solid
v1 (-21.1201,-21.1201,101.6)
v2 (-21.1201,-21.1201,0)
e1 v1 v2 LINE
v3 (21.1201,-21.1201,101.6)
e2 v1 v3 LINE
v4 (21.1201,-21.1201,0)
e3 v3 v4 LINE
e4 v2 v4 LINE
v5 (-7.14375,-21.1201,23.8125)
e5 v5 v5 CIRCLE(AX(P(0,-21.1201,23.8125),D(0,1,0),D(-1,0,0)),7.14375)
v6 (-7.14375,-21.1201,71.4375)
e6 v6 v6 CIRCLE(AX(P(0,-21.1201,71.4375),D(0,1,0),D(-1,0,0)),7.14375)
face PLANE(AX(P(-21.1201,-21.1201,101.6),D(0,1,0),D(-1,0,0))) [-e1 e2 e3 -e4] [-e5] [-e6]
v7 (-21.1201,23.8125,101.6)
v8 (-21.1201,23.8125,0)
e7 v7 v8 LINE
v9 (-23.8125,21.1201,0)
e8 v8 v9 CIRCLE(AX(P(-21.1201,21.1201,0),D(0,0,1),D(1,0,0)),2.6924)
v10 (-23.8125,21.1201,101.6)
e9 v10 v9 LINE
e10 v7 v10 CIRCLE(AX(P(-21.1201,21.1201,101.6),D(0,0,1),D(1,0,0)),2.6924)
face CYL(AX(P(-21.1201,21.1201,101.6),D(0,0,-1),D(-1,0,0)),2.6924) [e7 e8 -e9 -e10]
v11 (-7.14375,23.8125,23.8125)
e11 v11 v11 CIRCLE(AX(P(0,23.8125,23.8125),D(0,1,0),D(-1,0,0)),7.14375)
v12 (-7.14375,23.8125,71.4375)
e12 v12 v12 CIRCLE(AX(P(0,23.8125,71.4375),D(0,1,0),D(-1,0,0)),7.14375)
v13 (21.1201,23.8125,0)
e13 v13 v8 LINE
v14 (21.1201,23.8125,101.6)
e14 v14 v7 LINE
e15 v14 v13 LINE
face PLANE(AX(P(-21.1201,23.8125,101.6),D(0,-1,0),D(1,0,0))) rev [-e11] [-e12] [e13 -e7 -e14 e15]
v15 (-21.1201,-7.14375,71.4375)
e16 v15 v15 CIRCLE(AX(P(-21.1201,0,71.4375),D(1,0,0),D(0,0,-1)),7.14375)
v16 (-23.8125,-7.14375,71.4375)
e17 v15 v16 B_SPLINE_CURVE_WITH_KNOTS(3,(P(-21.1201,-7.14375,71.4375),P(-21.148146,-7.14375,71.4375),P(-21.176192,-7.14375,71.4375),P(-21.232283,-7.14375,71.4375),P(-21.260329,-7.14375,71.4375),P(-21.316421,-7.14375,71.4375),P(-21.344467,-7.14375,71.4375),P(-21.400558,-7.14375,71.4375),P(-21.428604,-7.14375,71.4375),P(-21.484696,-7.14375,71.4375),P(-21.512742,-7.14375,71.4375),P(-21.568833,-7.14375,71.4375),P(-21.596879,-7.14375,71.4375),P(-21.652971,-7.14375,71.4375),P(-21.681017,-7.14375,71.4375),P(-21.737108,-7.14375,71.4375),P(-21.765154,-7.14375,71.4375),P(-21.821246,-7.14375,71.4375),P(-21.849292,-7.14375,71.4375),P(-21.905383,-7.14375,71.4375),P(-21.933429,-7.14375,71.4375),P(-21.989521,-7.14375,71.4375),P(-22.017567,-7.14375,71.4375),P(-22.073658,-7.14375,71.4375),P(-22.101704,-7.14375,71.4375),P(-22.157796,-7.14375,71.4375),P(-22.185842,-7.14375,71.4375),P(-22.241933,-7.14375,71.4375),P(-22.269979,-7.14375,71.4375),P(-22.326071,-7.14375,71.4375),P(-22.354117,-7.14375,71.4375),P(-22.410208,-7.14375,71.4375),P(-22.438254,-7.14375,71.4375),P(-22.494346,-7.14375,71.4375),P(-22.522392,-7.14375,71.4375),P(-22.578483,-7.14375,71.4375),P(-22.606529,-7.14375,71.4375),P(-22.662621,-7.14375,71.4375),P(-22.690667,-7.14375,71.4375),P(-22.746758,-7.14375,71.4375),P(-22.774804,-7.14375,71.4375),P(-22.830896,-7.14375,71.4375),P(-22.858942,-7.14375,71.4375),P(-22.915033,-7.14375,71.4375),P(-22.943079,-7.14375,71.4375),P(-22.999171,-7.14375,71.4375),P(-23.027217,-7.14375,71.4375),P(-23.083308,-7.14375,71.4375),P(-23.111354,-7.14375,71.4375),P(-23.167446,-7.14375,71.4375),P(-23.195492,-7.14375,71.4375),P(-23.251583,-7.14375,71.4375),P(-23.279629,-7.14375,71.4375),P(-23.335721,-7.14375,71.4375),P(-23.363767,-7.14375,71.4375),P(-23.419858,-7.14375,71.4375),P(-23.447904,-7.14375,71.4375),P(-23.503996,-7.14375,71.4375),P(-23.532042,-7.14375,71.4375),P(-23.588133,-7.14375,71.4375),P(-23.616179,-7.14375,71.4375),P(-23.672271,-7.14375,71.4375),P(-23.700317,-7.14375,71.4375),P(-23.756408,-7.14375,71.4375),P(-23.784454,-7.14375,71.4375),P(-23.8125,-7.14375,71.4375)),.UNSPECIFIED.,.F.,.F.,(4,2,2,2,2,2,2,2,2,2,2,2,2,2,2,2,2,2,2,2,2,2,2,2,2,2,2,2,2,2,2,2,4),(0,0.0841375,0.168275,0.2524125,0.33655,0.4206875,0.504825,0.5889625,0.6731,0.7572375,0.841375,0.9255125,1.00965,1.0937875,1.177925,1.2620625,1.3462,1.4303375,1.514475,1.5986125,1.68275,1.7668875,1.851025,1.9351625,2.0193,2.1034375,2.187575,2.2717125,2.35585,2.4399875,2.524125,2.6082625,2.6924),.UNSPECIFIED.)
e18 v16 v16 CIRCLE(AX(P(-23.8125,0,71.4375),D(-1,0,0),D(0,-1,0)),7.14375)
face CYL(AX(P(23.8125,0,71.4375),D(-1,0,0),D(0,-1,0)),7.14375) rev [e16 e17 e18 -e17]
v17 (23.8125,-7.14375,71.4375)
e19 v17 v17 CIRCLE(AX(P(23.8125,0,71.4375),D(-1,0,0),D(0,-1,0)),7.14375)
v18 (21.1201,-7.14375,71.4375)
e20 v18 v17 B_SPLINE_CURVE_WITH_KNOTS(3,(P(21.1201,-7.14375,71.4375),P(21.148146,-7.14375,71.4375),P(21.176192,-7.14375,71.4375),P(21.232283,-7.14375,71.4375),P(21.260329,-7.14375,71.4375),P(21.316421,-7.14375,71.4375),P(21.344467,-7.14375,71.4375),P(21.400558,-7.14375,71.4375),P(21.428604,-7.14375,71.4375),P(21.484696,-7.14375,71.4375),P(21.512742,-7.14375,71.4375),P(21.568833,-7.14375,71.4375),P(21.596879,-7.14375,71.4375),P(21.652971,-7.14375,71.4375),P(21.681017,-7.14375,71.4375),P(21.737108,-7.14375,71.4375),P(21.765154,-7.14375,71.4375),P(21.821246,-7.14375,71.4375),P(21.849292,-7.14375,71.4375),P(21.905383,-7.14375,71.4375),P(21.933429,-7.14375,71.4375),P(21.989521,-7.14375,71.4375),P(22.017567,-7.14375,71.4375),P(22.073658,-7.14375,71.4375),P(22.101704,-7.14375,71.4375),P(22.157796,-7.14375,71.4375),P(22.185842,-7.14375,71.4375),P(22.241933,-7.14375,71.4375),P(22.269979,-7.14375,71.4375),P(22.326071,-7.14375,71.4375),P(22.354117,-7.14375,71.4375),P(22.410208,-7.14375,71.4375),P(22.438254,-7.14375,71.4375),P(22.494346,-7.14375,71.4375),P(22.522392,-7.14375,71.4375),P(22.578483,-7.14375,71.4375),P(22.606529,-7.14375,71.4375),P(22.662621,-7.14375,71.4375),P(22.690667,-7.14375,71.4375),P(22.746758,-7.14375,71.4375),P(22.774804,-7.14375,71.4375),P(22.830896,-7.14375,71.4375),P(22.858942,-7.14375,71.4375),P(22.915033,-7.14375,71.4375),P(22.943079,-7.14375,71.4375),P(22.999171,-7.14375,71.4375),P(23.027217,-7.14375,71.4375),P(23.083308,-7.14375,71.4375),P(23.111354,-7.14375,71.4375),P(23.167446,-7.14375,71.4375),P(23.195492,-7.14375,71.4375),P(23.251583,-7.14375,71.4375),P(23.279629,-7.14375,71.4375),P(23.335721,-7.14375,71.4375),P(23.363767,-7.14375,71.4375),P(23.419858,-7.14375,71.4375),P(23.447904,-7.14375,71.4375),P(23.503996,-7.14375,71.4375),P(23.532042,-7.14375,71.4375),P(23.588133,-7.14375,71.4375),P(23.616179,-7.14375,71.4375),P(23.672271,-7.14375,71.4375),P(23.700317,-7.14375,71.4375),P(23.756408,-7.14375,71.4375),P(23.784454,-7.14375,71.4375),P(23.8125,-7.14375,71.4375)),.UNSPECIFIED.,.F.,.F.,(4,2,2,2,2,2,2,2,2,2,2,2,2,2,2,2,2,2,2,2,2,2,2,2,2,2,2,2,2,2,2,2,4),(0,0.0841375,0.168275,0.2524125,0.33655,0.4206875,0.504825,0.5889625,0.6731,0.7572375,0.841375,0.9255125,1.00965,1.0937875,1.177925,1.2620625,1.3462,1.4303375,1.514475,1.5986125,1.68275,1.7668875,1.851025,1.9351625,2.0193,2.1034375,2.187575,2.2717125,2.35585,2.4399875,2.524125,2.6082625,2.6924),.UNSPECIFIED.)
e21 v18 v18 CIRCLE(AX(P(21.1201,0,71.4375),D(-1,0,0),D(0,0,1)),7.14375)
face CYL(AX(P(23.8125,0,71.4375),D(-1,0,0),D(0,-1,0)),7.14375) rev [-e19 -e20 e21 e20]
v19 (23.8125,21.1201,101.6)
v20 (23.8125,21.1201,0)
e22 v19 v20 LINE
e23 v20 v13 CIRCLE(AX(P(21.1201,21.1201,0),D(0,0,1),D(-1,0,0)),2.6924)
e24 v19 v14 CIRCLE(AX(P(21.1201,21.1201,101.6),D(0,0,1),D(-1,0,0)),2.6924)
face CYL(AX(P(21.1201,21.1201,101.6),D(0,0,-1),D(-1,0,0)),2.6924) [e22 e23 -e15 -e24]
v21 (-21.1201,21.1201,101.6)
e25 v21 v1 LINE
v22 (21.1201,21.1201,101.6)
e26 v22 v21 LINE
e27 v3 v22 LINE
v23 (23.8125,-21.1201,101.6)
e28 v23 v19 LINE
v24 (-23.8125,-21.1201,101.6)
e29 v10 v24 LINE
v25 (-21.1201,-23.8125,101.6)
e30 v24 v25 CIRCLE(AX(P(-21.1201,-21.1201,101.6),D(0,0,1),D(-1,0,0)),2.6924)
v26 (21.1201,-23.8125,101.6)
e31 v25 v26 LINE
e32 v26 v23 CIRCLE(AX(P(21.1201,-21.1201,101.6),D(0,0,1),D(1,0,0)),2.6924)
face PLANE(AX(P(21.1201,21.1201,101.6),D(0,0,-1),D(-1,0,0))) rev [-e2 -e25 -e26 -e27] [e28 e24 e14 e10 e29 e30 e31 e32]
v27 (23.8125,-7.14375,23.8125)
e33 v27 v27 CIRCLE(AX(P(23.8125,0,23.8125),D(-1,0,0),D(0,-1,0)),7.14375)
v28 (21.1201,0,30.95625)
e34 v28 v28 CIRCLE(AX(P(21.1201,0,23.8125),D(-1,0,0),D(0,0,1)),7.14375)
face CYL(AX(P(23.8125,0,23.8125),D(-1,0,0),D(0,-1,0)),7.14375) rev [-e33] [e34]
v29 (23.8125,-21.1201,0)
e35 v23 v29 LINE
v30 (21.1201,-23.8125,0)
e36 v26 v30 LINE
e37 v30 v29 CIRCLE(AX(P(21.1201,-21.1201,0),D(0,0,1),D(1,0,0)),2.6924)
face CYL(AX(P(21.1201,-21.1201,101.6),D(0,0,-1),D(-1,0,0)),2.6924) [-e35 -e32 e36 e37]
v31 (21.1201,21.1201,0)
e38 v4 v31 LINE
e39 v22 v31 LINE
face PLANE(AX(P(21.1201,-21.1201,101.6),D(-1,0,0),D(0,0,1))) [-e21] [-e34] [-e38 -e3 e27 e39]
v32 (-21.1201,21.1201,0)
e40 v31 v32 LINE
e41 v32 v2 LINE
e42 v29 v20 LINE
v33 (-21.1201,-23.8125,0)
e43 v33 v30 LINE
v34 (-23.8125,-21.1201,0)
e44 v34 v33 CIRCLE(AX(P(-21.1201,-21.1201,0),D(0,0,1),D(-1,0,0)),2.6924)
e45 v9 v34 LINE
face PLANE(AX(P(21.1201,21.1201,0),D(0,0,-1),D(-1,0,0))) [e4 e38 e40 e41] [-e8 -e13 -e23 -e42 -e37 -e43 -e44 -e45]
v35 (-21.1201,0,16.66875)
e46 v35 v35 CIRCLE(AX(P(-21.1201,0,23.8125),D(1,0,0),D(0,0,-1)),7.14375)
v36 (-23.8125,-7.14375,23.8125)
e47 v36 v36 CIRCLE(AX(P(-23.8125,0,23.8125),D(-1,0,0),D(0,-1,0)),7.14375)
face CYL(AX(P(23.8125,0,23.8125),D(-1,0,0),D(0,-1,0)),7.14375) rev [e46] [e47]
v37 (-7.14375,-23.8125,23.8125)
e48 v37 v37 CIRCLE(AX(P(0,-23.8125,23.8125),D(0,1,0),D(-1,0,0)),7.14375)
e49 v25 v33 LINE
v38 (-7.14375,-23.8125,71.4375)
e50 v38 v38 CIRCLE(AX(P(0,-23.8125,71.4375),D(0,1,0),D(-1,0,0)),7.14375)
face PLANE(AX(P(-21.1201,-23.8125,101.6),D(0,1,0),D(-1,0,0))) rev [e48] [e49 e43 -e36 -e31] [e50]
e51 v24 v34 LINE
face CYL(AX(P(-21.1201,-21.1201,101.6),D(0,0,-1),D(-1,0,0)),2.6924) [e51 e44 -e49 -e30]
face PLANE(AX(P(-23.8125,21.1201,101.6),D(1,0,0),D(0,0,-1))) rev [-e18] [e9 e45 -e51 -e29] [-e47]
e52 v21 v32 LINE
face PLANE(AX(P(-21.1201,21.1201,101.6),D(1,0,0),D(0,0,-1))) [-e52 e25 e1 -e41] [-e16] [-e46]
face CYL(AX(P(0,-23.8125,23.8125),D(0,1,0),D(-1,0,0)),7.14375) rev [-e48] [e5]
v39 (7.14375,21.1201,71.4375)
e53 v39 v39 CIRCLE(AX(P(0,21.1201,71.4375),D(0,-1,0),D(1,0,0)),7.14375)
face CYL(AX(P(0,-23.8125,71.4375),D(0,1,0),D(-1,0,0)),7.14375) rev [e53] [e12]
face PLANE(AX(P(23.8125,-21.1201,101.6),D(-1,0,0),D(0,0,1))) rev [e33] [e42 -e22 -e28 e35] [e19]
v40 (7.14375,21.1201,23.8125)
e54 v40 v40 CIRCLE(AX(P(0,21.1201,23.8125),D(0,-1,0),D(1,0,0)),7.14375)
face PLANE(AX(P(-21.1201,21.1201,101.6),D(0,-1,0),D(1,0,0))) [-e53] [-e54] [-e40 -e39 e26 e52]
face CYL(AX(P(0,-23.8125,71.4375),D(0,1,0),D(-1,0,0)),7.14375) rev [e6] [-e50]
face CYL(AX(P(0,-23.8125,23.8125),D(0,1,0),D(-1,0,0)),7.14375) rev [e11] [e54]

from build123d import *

# Parameters (mm, degrees)
SKETCH1_W                 = 42.2402
SKETCH1_H                 = 42.2402
BASE_EXTRUDE_DEPTH        = 101.6
HOLE1_START               = -23.8125
HOLE1_OUTLINE_R           = 7.14375
HOLE1_DEPTH               = 47.625
CIRPATTERN2_COUNT         = 2
CIRPATTERN2_ANGLE         = 90
LPATTERN1_COUNT           = 2
LPATTERN1_PITCH           = 47.625
LPATTERN1_START           = -23.8125
LPATTERN1_COPY_1_SKETCH_R = 7.14375
LPATTERN1_COPY_1_DEPTH    = 47.625


# Read off the part's stored shape, not the designer's step: Hole1
with BuildPart() as part:
    # Sketch1 → Base-Extrude (new body)
    with BuildSketch(Plane.XY):
        with BuildLine():
            Line((-23.8125, 21.1201), (-23.8125, -21.1201))
            ThreePointArc((-23.8125, -21.1201), (-23.023914298, -23.023914298), (-21.1201, -23.8125))
            Line((-21.1201, -23.8125), (21.1201, -23.8125))
            ThreePointArc((21.1201, -23.8125), (23.023914298, -23.023914298), (23.8125, -21.1201))
            Line((23.8125, -21.1201), (23.8125, 21.1201))
            ThreePointArc((23.8125, 21.1201), (23.023914298, 23.023914298), (21.1201, 23.8125))
            Line((21.1201, 23.8125), (-21.1201, 23.8125))
            ThreePointArc((-21.1201, 23.8125), (-23.023914298, 23.023914298), (-23.8125, 21.1201))
        make_face()
        Rectangle(SKETCH1_W, SKETCH1_H, mode=Mode.SUBTRACT)
    extrude(amount=BASE_EXTRUDE_DEPTH)

    # Hole1 outline → Hole1 (cut)
    with BuildSketch(Plane(origin=(0, 0, 0), x_dir=(1, 0, 0), z_dir=(0, 1, 0)).offset(HOLE1_START)):
        with Locations((0, -23.8125)):
            Circle(HOLE1_OUTLINE_R)
    hole1 = extrude(amount=HOLE1_DEPTH, mode=Mode.SUBTRACT)

    # CirPattern2: Hole1 ×2 about axis
    cirpattern2_axis = Axis((0, 0, -50), (0, 0, 1))
    for i in range(1, CIRPATTERN2_COUNT):
        add(hole1.rotate(cirpattern2_axis, i * CIRPATTERN2_ANGLE / (CIRPATTERN2_COUNT - 1)), mode=Mode.SUBTRACT)

    # LPattern1: Hole1 ×2
    with Locations(*[(0, 0, i * LPATTERN1_PITCH) for i in range(1, LPATTERN1_COUNT)]):
        add(hole1, mode=Mode.SUBTRACT)

    # LPattern1 copy 1 sketch → LPattern1 copy 1 (cut)
    with BuildSketch(Plane(origin=(0, 0, 47.625), x_dir=(0, 1, 0), z_dir=(-1, 0, 0)).offset(LPATTERN1_START)):
        with Locations((0, -23.8125)):
            Circle(LPATTERN1_COPY_1_SKETCH_R)
    extrude(amount=LPATTERN1_COPY_1_DEPTH, mode=Mode.SUBTRACT)


solid = part.part
